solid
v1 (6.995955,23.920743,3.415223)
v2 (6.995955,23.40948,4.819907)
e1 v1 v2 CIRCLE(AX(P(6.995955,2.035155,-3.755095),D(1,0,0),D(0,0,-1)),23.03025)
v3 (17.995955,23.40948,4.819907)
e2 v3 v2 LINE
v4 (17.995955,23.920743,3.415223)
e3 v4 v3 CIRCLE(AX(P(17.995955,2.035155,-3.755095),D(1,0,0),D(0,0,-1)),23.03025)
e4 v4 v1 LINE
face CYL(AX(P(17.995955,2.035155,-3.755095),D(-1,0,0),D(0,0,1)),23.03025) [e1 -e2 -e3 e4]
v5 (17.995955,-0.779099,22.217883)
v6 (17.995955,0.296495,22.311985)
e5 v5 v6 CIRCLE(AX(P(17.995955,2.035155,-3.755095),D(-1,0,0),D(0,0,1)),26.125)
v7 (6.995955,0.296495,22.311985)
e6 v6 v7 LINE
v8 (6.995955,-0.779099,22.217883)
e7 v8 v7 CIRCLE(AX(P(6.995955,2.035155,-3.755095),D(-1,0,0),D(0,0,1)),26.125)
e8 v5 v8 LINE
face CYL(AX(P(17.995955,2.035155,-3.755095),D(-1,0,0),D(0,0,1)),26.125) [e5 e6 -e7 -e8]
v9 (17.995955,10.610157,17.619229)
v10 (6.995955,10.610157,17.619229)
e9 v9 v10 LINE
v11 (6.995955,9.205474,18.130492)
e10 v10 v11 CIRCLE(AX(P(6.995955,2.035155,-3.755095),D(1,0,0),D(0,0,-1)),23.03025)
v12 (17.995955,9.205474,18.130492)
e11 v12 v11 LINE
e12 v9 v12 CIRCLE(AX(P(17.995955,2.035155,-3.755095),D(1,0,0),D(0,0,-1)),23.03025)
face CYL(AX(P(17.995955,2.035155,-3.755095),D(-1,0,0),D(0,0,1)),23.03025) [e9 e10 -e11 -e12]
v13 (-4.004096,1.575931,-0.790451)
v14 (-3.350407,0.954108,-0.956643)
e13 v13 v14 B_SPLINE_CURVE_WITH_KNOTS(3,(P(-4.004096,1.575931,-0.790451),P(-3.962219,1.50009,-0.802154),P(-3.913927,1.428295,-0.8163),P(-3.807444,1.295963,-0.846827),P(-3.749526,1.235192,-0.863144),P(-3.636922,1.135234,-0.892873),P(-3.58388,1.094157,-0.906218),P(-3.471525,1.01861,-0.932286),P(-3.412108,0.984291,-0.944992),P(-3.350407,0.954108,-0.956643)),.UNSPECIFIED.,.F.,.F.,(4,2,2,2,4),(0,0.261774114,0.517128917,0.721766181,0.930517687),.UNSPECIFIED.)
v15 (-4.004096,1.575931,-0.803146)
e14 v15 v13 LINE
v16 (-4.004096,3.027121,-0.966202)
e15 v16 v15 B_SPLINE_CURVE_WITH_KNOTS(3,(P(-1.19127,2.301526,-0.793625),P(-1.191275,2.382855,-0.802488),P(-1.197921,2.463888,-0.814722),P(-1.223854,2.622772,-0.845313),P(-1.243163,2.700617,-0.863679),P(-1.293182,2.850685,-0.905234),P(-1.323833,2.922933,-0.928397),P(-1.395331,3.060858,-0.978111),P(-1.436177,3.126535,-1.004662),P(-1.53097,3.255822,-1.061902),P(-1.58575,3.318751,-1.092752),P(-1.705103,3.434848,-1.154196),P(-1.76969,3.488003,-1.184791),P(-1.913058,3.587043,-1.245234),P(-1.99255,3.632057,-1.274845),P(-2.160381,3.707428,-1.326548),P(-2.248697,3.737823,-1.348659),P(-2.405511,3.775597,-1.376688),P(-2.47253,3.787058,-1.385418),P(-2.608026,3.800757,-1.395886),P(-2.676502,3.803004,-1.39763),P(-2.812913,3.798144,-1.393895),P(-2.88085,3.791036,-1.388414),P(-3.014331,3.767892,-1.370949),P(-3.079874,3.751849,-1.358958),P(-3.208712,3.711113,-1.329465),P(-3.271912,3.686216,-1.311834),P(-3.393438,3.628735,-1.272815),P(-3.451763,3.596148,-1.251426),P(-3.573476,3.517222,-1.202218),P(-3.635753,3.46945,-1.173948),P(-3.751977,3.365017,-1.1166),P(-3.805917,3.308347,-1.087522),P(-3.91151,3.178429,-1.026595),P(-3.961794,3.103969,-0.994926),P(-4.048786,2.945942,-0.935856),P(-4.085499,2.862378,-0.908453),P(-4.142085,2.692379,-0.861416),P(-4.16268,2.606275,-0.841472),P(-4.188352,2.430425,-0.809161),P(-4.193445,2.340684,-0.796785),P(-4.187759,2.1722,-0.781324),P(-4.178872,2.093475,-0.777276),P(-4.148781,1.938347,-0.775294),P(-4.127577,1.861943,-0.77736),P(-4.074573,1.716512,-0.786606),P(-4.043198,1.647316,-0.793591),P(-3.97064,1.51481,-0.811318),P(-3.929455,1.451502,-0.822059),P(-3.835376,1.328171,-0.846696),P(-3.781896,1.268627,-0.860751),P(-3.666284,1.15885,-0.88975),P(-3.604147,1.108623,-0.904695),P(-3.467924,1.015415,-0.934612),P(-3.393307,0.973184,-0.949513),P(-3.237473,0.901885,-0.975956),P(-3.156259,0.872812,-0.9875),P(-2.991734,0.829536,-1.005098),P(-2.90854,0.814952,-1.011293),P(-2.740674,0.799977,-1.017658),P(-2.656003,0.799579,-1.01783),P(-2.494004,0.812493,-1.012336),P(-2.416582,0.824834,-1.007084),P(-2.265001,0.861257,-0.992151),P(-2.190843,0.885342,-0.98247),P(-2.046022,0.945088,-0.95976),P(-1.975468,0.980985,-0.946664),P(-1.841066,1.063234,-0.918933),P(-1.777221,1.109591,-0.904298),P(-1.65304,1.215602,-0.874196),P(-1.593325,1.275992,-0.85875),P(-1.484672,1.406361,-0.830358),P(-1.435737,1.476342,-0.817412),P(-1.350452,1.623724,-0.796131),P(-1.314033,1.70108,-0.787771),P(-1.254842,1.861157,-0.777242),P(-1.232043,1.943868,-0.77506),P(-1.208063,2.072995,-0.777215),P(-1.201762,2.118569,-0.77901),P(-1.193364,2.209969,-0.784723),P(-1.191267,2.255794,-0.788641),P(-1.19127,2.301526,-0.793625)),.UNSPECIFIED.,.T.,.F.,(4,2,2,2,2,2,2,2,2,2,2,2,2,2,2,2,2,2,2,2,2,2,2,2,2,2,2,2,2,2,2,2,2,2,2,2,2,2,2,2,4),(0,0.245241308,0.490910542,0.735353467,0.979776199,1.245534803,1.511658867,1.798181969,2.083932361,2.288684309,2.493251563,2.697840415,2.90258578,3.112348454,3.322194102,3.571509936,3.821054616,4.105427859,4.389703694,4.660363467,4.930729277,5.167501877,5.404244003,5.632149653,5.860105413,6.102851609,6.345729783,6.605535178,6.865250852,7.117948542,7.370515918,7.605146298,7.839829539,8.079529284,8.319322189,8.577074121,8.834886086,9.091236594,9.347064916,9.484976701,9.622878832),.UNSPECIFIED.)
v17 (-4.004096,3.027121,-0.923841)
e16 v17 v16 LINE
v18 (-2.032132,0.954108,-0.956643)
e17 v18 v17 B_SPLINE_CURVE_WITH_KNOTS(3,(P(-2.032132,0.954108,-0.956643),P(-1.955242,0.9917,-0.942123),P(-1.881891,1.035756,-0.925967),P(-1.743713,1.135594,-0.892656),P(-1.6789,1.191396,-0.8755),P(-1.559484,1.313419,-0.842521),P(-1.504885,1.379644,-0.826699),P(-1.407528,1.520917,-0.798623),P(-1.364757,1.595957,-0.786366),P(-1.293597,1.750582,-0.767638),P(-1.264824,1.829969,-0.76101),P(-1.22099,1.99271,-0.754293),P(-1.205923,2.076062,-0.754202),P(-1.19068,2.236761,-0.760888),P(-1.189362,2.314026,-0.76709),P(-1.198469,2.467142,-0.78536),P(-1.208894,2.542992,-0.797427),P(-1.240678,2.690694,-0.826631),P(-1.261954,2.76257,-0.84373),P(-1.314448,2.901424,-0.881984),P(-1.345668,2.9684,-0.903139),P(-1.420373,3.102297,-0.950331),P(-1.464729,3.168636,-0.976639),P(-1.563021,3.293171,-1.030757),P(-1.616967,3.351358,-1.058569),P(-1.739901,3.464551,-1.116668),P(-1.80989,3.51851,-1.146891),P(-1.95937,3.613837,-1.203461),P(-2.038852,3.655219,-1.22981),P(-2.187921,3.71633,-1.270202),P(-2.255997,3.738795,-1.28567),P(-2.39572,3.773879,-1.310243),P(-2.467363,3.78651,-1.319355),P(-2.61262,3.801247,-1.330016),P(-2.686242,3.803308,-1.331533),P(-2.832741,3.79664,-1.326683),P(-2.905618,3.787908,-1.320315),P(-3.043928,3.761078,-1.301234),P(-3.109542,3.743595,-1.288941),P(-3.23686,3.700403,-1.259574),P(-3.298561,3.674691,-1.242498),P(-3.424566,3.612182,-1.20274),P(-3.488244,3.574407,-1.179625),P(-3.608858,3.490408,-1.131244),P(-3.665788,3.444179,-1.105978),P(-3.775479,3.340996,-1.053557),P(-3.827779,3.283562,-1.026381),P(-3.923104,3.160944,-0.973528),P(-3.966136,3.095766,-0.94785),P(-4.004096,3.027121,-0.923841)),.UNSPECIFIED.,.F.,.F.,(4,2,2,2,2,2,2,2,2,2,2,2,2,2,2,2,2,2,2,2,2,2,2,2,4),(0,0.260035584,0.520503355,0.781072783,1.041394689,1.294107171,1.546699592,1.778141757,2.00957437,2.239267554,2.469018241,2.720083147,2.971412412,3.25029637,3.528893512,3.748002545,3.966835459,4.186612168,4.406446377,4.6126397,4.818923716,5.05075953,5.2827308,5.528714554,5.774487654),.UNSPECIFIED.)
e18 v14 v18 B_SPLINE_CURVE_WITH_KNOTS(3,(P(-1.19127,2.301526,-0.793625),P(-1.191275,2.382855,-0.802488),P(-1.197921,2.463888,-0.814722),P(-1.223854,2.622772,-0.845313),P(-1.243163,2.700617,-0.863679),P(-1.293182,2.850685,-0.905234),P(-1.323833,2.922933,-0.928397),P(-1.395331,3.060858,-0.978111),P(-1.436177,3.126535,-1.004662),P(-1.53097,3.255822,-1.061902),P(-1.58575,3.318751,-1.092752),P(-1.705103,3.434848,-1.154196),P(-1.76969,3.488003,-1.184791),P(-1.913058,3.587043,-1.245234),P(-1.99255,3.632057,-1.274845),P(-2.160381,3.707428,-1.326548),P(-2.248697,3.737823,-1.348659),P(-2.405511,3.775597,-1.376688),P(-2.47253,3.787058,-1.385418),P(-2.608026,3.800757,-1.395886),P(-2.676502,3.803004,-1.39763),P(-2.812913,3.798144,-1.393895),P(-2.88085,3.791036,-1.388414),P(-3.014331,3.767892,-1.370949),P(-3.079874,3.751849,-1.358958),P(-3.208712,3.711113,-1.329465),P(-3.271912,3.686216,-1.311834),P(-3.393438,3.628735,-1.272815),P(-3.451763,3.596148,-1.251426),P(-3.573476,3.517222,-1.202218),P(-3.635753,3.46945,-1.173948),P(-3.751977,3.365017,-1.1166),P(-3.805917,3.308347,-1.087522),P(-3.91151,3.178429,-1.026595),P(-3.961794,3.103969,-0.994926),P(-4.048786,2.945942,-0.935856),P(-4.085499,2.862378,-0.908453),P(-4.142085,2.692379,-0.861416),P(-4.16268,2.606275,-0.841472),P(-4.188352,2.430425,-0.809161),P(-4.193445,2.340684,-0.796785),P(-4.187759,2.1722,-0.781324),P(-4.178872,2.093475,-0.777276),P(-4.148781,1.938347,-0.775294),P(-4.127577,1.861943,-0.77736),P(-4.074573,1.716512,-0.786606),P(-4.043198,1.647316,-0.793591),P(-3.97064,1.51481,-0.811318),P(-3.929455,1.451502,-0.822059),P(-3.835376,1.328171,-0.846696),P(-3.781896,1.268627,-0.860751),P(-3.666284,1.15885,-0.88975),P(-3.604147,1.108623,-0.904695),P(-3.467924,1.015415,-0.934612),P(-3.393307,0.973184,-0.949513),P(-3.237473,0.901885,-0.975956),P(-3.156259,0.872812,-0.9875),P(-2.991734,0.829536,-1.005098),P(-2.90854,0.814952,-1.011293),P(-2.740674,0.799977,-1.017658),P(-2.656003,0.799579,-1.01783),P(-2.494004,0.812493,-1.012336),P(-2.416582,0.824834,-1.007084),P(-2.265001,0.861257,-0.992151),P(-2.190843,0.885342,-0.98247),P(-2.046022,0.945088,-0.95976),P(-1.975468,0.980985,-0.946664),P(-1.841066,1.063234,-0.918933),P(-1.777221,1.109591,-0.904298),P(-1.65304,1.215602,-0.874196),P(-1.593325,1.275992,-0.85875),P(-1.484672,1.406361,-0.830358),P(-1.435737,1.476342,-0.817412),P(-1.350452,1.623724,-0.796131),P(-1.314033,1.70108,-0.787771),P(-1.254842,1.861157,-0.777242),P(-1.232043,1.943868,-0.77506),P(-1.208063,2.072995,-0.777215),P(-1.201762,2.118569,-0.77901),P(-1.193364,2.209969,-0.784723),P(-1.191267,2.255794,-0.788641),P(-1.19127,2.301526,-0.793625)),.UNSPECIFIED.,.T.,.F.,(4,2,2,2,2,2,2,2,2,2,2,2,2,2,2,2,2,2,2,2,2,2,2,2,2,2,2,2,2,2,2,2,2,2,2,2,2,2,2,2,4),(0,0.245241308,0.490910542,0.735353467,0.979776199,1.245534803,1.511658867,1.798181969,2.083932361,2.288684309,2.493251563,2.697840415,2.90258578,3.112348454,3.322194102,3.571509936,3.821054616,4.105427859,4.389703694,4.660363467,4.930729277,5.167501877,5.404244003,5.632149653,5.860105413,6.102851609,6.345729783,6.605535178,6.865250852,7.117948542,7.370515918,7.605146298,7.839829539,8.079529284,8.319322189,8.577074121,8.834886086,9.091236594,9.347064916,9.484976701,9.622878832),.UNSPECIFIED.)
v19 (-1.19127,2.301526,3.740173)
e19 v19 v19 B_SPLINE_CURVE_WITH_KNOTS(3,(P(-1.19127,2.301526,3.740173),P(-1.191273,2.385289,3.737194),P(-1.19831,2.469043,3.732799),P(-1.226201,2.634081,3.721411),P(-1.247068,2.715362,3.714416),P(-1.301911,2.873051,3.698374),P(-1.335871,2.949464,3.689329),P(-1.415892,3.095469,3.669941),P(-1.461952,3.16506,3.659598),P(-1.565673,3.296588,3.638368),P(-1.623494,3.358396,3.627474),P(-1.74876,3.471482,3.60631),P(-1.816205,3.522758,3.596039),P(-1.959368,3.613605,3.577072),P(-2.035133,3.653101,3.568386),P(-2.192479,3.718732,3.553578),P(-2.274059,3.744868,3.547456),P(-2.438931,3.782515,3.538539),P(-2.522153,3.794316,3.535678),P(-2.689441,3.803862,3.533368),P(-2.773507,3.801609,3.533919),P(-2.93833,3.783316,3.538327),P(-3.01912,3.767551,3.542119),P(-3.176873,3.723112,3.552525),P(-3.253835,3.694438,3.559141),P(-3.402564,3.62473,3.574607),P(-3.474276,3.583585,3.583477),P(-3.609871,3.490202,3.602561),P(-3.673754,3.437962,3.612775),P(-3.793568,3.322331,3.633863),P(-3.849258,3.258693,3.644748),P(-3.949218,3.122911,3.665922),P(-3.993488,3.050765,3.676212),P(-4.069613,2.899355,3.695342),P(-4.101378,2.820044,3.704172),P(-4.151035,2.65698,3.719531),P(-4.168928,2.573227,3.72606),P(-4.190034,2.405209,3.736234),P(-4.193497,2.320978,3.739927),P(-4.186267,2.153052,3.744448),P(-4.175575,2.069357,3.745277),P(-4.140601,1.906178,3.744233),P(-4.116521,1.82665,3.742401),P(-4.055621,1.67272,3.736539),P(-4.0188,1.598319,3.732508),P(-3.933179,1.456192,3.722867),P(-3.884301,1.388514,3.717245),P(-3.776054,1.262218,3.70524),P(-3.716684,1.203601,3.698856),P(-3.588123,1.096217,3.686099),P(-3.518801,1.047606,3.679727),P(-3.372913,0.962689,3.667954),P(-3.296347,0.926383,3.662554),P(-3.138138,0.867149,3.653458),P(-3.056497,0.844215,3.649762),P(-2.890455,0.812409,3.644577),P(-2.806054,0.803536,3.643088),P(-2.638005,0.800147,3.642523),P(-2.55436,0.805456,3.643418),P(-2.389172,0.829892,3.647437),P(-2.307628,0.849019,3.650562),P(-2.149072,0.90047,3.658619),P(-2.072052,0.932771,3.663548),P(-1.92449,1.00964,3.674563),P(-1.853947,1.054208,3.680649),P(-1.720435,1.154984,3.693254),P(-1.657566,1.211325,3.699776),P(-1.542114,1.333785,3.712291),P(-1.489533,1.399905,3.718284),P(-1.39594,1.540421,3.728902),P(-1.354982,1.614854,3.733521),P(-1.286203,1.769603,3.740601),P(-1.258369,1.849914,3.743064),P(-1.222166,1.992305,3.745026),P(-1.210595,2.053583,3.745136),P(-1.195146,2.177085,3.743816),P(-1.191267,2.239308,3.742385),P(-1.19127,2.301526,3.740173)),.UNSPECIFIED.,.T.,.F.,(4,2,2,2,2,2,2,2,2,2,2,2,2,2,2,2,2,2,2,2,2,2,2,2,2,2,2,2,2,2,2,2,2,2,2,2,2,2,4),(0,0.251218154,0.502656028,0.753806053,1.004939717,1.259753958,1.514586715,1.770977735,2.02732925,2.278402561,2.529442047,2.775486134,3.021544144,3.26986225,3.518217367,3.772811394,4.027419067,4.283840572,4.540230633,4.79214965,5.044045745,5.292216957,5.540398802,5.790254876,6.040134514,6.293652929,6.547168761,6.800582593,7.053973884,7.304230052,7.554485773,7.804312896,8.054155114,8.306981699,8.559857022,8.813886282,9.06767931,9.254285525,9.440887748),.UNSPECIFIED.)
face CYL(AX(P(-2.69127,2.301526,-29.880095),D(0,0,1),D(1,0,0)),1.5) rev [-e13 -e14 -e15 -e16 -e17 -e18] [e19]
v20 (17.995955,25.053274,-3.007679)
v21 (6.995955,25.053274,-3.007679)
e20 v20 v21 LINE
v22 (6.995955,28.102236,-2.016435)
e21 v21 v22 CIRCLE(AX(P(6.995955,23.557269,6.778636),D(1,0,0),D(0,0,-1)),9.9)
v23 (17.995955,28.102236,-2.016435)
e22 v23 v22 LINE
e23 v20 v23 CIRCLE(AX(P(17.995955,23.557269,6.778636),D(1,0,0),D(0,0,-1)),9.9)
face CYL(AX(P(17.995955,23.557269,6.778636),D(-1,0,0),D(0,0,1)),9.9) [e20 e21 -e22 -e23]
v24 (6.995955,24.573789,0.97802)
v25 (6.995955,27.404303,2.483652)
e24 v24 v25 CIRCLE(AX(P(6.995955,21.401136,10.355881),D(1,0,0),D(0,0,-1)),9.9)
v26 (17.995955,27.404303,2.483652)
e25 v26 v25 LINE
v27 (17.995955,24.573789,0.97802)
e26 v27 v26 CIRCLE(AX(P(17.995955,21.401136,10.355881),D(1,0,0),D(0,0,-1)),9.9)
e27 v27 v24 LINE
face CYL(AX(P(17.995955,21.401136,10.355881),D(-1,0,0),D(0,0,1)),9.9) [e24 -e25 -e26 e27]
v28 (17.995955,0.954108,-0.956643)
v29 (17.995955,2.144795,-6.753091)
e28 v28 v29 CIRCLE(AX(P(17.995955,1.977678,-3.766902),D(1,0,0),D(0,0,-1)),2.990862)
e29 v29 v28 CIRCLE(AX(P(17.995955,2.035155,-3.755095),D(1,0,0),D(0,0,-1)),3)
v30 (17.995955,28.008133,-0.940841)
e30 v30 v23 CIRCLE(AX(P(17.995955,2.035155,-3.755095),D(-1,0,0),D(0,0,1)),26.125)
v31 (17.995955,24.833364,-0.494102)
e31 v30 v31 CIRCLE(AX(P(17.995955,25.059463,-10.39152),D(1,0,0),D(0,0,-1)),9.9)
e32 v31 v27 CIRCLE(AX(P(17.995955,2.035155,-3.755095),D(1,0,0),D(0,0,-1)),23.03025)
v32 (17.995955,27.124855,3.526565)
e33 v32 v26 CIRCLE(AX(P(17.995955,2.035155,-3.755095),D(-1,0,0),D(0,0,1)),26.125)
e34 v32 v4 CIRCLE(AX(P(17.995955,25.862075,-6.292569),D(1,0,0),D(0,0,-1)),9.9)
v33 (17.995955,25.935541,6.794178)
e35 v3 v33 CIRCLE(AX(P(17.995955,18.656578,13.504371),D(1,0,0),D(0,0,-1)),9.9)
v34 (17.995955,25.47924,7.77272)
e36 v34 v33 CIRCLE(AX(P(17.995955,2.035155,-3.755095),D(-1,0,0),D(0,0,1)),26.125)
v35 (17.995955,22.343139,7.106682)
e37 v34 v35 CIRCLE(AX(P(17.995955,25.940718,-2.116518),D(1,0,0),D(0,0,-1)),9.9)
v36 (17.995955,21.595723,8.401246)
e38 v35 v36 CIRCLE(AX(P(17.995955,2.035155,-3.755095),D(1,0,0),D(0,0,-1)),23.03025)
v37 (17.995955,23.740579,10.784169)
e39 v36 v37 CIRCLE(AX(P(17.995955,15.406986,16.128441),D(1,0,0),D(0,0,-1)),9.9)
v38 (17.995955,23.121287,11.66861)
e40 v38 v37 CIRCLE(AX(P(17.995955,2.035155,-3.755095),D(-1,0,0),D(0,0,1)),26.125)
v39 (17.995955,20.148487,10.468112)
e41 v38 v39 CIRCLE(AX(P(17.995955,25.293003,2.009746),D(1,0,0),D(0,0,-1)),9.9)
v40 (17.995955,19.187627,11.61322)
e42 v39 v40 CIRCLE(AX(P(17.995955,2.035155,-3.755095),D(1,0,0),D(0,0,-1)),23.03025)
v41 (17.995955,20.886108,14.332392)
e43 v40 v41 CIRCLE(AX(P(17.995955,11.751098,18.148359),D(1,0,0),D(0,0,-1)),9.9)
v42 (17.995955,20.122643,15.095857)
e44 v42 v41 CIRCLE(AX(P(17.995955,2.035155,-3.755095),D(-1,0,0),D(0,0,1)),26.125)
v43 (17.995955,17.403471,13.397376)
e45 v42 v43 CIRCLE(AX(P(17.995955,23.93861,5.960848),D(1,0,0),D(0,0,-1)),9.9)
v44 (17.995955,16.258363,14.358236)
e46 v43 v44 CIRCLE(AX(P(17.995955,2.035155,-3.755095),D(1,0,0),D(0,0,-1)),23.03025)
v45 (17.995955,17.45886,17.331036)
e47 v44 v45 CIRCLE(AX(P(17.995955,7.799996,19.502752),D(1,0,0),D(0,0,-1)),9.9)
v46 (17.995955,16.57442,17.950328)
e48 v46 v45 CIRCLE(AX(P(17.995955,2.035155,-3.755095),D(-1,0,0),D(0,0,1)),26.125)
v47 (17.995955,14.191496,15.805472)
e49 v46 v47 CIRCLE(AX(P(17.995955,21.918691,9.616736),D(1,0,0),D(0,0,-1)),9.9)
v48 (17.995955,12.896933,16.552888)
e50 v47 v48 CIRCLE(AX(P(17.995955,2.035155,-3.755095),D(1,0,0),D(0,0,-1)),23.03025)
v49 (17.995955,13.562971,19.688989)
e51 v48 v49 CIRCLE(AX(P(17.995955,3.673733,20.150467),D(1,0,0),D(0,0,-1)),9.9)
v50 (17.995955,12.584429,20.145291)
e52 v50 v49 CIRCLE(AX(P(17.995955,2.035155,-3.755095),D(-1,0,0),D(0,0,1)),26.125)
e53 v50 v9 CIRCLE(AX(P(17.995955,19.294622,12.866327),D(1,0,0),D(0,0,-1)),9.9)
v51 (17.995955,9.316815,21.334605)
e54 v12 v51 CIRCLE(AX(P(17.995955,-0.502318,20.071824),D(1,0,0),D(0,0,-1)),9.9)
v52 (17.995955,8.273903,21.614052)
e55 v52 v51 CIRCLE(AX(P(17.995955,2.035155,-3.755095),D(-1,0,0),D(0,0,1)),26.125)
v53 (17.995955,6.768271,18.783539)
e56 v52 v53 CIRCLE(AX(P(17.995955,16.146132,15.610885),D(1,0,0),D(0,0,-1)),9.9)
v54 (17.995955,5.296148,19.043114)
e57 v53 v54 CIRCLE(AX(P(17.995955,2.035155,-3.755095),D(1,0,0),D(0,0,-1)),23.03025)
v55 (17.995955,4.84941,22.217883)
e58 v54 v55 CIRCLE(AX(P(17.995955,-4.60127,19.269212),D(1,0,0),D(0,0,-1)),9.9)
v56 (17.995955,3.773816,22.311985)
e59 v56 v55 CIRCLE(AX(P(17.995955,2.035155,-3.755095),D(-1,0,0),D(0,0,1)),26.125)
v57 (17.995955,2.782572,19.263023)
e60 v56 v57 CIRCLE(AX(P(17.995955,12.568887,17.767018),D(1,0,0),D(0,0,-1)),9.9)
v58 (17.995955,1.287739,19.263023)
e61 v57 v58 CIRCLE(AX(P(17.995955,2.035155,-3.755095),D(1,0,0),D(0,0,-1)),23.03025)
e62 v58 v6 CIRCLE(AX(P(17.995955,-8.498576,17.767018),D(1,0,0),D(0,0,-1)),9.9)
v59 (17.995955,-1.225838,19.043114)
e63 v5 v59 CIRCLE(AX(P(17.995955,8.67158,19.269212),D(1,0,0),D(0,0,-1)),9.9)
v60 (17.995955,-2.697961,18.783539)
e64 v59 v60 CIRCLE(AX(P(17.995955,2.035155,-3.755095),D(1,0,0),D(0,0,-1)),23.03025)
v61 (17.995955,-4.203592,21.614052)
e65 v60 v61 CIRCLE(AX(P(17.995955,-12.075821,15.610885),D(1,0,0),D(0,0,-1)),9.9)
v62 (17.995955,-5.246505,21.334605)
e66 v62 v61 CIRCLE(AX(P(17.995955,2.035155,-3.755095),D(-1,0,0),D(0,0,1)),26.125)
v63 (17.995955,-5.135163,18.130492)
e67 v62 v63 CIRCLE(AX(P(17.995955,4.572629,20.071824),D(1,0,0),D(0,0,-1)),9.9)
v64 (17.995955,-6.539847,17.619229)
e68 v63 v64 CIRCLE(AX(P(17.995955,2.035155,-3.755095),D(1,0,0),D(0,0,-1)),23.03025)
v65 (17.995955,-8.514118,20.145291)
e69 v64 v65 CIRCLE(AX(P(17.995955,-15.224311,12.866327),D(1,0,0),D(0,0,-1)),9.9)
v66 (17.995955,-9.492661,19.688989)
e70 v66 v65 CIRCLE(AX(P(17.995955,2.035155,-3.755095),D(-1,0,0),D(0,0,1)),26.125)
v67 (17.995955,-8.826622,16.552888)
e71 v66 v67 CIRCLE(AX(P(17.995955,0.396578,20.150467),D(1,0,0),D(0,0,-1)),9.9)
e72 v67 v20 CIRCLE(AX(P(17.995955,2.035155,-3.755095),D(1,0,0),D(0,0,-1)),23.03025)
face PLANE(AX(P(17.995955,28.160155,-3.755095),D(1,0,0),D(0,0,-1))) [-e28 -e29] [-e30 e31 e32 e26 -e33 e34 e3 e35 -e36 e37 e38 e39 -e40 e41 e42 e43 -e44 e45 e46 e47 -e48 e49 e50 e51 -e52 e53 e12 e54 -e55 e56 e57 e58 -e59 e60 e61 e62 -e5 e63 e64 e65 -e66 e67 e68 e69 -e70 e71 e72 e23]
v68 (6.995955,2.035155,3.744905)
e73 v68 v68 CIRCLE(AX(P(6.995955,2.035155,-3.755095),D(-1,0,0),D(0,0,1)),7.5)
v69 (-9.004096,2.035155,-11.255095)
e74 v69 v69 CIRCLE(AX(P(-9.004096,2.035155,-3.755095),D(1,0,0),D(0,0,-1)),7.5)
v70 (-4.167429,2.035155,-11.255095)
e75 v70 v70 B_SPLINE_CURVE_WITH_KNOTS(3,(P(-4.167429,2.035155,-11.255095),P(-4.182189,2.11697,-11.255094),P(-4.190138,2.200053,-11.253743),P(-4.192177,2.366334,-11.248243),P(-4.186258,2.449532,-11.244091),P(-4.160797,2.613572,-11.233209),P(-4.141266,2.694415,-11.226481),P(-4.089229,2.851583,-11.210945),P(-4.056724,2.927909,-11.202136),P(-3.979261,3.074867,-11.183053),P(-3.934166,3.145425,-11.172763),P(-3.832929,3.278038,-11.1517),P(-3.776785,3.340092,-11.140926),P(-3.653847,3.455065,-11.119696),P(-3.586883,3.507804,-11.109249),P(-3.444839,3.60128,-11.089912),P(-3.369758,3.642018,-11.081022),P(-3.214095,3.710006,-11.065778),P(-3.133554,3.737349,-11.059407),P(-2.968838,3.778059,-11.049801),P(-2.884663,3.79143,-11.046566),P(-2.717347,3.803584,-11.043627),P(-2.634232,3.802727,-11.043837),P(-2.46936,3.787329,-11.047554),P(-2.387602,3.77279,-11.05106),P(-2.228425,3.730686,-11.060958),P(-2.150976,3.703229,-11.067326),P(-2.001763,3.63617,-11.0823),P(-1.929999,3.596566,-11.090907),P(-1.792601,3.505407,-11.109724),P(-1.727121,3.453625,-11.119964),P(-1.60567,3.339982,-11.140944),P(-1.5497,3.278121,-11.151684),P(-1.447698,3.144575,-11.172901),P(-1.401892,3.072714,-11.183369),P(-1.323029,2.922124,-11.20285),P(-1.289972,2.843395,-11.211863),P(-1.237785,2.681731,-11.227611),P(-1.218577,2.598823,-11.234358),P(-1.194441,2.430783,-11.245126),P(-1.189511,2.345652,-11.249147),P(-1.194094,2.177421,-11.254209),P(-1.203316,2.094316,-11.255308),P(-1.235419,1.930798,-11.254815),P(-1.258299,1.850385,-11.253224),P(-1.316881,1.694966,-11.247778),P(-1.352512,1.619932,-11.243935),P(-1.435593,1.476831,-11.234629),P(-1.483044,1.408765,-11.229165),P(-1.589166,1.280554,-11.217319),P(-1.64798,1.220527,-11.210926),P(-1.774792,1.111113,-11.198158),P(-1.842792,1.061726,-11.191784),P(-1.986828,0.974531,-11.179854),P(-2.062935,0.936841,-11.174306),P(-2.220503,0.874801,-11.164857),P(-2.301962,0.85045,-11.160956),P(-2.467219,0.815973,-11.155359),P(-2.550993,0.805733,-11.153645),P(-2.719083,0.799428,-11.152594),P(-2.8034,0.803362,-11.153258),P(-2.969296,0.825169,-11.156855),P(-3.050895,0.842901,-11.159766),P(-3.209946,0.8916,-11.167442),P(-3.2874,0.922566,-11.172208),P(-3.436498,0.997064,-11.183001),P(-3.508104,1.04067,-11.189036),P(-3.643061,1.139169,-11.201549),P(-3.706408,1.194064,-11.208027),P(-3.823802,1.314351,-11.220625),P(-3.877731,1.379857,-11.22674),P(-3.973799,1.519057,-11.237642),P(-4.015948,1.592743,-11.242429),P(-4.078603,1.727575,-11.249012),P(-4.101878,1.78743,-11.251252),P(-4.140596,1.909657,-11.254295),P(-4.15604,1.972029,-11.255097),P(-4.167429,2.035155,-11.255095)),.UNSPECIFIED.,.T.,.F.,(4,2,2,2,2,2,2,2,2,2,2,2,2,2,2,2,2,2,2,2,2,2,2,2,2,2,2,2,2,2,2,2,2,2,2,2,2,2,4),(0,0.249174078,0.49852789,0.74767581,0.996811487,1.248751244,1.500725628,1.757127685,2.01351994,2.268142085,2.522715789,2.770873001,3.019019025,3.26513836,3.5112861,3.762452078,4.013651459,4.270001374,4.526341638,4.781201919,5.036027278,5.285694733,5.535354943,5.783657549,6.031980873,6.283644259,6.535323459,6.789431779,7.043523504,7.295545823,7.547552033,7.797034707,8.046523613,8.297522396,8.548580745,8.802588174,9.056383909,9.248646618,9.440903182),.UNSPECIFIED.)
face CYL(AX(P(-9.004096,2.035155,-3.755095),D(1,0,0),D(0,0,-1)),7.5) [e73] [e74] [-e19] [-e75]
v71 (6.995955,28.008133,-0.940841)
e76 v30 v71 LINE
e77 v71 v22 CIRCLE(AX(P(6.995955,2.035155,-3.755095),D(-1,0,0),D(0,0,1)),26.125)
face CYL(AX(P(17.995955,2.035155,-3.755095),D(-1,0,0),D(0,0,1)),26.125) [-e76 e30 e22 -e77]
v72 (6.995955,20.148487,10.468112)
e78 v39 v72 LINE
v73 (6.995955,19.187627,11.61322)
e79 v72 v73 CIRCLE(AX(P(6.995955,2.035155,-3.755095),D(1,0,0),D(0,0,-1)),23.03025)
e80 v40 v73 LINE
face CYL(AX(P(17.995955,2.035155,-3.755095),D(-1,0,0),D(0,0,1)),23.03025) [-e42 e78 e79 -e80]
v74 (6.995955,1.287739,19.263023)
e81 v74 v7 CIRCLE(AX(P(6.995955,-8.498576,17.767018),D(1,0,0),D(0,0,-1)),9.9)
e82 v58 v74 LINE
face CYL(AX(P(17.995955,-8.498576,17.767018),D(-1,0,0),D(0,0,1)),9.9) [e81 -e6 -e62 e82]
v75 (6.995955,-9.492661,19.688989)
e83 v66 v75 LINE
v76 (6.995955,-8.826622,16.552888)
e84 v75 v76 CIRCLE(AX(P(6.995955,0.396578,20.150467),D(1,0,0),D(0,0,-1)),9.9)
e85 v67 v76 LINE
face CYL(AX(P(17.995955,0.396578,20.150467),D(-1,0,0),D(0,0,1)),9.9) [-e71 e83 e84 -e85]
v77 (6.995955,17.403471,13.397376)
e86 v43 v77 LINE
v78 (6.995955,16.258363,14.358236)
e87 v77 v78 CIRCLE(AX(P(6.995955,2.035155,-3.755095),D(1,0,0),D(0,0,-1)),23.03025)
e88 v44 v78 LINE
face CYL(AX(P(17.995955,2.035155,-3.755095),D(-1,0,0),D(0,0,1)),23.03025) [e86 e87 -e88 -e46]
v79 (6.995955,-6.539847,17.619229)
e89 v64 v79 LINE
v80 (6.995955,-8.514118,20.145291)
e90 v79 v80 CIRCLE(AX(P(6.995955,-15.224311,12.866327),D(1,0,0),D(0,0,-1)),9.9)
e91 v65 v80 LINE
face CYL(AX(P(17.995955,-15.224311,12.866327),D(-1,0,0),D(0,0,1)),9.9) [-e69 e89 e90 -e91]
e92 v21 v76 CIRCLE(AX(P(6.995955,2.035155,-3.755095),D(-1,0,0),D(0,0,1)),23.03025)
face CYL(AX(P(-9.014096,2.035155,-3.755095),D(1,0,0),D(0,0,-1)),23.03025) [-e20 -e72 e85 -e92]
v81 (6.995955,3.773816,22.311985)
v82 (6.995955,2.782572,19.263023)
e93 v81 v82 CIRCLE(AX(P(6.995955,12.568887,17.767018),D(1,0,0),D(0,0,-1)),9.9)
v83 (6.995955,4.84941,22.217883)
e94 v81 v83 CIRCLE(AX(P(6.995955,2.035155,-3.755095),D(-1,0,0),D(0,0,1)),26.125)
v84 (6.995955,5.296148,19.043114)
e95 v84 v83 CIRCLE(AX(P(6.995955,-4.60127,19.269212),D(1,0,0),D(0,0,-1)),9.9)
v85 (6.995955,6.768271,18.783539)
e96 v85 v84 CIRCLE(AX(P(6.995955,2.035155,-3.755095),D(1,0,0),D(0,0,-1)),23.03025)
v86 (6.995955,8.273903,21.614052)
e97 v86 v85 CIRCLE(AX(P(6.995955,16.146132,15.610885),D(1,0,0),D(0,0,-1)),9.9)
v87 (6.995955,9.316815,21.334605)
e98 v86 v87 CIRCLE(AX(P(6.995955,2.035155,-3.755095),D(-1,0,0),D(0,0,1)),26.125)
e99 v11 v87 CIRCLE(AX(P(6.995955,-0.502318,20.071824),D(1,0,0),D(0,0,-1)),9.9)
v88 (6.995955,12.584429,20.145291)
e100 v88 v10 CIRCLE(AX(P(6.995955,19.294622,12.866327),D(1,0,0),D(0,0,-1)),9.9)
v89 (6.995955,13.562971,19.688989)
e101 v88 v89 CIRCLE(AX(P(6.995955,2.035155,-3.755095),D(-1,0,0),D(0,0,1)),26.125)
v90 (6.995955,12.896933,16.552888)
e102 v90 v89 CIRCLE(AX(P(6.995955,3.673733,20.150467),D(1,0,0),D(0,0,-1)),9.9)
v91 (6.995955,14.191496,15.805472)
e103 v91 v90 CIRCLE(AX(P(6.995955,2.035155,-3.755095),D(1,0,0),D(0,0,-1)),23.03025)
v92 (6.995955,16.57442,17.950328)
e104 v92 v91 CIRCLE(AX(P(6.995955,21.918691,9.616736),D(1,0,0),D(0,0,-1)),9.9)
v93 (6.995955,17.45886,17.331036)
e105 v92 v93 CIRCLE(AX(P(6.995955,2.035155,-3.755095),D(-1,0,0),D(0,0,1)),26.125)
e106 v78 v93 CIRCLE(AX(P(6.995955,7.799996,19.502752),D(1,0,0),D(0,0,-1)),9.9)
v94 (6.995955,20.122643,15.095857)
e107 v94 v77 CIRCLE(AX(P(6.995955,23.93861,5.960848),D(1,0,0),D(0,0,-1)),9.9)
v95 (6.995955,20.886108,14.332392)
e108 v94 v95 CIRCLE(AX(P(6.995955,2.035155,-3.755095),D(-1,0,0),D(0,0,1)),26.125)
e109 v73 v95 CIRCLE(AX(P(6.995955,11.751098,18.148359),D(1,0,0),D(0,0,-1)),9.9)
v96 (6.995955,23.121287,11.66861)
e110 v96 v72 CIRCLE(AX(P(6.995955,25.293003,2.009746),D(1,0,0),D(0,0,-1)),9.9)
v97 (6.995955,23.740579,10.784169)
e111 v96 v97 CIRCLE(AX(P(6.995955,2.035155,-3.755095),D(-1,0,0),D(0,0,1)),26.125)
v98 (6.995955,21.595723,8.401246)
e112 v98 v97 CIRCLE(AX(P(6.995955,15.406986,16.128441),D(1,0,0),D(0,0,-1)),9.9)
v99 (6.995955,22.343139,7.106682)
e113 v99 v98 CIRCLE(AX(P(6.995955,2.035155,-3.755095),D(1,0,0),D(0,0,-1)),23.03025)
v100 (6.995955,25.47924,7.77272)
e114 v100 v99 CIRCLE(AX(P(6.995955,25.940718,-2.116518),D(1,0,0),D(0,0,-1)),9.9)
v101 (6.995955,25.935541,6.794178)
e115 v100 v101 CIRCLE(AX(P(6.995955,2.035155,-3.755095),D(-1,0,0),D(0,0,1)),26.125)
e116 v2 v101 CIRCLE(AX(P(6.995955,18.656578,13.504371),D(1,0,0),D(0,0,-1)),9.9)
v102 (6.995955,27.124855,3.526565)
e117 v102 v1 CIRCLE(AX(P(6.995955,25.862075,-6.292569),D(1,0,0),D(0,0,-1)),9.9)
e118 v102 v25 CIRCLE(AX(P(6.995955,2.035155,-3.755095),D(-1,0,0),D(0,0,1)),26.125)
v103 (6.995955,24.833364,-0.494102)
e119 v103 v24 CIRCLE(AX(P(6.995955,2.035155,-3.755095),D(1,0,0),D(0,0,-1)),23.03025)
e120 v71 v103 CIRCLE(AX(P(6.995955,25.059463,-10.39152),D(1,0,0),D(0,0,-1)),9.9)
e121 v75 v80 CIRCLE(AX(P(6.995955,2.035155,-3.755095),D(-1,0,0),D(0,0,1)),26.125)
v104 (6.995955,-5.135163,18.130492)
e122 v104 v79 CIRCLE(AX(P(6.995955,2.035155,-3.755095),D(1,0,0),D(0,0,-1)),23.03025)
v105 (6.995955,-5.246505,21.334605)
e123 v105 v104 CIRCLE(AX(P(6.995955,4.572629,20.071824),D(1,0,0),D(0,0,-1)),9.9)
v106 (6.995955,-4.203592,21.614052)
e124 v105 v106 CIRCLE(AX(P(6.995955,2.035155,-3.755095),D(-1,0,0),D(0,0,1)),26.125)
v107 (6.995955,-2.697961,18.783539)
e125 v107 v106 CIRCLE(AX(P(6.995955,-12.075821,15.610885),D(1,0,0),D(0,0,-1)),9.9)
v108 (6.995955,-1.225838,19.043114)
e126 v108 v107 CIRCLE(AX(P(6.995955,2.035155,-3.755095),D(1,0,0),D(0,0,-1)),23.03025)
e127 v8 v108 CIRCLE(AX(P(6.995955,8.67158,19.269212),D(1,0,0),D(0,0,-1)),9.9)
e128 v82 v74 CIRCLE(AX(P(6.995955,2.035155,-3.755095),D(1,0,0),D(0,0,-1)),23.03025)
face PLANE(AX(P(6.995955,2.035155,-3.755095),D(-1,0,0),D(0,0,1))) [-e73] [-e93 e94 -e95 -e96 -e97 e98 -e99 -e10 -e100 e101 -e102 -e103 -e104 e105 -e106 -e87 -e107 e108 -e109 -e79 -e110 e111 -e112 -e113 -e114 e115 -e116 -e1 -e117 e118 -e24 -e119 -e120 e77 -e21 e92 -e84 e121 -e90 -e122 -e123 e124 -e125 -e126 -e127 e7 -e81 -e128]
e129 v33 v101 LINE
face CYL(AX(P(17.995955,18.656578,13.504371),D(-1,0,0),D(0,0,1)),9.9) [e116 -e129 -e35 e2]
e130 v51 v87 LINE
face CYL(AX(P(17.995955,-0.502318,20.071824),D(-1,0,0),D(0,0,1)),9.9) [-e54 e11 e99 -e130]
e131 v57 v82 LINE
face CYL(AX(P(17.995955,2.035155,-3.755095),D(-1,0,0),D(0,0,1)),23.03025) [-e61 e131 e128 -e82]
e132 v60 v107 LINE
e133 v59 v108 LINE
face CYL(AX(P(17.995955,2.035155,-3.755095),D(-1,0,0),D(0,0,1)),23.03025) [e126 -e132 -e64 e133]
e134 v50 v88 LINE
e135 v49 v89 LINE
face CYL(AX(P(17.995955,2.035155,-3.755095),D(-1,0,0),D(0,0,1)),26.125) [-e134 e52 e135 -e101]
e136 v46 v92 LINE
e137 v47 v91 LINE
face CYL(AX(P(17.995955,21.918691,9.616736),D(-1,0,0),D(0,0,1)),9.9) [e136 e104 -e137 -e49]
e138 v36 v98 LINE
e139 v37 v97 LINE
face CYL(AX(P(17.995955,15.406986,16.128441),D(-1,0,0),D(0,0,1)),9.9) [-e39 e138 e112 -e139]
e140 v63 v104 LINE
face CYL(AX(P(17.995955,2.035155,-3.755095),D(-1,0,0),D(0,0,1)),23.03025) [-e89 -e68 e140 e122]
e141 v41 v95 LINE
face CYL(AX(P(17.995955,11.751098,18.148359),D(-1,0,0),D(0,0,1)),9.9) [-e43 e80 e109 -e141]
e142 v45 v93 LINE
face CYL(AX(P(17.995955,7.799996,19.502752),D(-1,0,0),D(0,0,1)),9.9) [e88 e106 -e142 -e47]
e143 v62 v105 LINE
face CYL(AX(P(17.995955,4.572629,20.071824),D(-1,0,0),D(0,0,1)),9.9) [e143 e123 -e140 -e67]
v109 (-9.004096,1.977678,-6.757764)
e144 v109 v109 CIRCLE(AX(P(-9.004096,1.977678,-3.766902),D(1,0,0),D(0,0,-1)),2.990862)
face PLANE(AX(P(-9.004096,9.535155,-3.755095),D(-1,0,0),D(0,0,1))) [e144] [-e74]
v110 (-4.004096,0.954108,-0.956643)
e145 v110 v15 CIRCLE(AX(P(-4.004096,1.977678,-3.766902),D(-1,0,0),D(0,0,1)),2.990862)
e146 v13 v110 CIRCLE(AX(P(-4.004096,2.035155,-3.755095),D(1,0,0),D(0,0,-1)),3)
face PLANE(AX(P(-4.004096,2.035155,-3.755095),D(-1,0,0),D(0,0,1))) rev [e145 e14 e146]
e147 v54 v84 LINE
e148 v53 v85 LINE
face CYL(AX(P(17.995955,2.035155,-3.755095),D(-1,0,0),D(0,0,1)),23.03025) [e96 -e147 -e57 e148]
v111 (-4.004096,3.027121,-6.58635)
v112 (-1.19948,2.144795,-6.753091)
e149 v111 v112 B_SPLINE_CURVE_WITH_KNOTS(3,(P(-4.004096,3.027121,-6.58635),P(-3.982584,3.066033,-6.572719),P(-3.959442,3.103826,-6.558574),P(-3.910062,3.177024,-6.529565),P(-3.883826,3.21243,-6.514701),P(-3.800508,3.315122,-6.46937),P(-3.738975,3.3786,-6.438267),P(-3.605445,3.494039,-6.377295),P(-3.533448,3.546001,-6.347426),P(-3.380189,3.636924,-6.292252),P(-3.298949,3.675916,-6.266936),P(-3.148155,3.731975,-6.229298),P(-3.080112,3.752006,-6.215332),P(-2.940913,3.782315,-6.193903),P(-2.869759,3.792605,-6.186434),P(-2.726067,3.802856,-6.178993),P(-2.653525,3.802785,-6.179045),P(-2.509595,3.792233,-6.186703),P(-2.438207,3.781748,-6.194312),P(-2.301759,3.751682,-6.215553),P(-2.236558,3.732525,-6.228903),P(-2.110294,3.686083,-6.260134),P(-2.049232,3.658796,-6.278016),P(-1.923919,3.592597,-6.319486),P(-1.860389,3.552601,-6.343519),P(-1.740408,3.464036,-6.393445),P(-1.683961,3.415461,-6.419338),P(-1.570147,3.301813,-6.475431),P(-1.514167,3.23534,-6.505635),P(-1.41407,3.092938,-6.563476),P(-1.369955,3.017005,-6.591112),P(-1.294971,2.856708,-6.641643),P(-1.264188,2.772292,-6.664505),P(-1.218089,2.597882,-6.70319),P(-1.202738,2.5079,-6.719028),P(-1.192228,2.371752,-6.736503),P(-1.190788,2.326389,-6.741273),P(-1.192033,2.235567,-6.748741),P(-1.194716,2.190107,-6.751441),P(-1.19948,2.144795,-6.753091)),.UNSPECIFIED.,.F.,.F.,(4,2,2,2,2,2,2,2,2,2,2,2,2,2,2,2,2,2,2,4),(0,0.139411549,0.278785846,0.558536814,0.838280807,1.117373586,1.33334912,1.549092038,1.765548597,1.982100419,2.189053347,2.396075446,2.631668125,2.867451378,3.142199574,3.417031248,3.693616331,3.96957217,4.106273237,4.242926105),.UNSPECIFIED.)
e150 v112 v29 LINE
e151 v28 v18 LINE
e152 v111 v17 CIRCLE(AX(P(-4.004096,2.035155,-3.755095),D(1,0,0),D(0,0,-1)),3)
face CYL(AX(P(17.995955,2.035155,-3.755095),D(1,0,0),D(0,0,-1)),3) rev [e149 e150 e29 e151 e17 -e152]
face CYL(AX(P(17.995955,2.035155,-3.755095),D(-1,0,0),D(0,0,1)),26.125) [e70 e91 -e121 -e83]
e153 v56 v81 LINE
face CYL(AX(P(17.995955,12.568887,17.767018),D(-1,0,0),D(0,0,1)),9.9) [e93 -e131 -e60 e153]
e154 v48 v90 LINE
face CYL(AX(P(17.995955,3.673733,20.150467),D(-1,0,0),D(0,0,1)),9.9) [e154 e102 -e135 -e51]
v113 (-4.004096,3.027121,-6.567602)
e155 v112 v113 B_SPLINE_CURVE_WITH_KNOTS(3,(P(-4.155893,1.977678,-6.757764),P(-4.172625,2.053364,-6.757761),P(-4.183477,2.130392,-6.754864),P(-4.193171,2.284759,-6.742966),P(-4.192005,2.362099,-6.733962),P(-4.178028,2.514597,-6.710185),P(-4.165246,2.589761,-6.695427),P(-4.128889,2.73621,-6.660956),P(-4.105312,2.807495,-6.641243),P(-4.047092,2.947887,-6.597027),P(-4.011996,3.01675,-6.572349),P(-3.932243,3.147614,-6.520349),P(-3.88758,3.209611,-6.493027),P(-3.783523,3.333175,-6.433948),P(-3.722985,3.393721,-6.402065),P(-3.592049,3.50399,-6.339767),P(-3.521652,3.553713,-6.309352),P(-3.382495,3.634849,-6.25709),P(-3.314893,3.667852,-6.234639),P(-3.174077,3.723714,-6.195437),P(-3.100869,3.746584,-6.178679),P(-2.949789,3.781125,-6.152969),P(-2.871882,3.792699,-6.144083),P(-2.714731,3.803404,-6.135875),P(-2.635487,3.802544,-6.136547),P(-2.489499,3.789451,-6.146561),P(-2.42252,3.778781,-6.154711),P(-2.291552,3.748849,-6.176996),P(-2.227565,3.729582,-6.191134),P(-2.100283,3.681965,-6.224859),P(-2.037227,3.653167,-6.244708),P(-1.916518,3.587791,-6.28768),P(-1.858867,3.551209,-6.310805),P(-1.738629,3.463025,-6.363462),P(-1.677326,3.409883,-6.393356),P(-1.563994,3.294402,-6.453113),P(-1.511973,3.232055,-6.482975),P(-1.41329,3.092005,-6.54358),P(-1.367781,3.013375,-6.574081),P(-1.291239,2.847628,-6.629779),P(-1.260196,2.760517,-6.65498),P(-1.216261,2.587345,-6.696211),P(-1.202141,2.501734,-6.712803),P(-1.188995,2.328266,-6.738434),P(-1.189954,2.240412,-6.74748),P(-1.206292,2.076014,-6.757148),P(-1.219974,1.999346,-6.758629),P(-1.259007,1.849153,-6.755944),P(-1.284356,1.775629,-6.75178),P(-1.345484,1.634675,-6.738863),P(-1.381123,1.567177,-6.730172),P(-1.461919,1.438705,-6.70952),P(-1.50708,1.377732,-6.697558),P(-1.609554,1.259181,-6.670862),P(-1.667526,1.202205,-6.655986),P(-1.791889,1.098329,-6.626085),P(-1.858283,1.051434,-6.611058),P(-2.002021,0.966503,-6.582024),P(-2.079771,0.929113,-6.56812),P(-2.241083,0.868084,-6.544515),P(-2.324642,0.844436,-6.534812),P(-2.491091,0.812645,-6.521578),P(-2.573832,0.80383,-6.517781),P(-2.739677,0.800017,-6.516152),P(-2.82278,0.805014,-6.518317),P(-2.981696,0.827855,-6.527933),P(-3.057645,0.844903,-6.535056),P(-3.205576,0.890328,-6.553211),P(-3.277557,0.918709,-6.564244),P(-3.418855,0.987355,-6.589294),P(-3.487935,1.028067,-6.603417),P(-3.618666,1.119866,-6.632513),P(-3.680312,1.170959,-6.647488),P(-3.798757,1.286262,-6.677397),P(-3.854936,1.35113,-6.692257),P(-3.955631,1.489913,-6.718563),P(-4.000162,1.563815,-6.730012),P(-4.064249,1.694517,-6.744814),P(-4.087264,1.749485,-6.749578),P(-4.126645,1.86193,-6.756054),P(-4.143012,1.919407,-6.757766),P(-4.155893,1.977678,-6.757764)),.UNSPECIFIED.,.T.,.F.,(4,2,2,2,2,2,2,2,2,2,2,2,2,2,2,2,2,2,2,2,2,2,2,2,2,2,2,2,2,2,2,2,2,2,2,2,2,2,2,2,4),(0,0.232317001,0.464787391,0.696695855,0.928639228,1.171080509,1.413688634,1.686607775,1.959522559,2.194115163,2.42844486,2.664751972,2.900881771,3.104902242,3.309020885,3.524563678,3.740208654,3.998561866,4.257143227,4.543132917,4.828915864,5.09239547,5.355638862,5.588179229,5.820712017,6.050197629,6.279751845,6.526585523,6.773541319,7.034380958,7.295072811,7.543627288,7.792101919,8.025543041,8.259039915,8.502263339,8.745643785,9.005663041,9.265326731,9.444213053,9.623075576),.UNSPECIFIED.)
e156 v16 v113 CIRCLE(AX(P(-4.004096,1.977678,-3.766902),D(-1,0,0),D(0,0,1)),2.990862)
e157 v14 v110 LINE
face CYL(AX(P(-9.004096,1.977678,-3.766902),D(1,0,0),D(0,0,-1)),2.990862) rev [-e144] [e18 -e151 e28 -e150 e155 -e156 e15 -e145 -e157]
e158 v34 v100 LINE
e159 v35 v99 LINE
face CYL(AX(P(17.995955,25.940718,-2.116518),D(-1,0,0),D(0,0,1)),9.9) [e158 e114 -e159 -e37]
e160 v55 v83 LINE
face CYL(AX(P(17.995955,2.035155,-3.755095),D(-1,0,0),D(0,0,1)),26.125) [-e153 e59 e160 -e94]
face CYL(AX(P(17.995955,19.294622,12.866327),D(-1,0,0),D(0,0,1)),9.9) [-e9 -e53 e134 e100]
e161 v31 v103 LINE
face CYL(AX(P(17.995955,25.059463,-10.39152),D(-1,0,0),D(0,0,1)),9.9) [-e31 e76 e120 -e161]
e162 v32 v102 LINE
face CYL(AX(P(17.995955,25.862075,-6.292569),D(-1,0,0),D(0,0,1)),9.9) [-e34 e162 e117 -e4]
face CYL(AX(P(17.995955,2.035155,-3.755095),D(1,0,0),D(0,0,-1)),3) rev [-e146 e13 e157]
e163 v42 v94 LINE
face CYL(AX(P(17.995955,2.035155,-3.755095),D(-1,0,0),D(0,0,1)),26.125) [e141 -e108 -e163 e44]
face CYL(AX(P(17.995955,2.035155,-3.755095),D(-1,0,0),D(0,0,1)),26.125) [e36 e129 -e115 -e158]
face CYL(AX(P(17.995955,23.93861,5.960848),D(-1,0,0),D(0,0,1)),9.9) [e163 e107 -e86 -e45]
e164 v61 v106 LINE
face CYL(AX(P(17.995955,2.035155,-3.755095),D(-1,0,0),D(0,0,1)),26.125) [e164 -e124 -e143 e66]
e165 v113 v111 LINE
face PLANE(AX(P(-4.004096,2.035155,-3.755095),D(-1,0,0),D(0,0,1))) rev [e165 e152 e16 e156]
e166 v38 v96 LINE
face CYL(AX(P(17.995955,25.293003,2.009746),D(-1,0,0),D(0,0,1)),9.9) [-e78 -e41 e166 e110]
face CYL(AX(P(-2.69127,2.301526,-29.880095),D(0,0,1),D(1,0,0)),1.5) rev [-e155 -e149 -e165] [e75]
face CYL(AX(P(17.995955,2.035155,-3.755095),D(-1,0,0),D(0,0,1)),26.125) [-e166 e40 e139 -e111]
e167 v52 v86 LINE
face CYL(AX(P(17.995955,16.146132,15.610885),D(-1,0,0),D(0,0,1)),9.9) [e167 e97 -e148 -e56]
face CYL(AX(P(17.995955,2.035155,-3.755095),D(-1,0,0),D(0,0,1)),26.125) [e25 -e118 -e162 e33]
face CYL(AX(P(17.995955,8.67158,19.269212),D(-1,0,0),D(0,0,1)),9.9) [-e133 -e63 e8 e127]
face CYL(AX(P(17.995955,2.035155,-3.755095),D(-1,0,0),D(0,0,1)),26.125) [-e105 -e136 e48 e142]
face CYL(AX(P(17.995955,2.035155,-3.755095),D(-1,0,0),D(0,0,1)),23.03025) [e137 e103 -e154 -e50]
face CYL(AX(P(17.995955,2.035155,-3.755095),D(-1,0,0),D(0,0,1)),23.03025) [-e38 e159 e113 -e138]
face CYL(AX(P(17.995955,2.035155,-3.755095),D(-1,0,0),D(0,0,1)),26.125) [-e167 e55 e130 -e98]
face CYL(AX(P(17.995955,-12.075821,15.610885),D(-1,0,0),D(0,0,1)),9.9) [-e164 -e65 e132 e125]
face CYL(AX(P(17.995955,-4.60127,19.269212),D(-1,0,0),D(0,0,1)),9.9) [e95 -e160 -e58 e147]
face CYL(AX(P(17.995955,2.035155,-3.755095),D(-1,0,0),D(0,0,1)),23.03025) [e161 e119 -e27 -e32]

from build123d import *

# Parameters (mm, degrees)
SKETCH1_W                    = 11
SKETCH1_H                    = 26.125
CUT_EXTRUDE1_DEPTH           = 43.506639989
CUT_EXTRUDE2_DEPTH           = 43.506639989
CUT_EXTRUDE3_DEPTH           = 43.506639989
CUT_EXTRUDE4_DEPTH           = 43.506639989
CUT_EXTRUDE5_DEPTH           = 43.506639989
CUT_EXTRUDE6_DEPTH           = 43.506639989
CUT_EXTRUDE7_DEPTH           = 43.506639989
CUT_EXTRUDE8_DEPTH           = 43.506639989
CUT_EXTRUDE9_DEPTH           = 43.506639989
CUT_EXTRUDE10_DEPTH          = 43.506639989
CUT_EXTRUDE11_DEPTH          = 43.468291129
CUT_EXTRUDE12_DEPTH          = 43.468291129
CUT_EXTRUDE13_DEPTH          = 43.468291129
SKETCH15_W                   = 16.0000508
SKETCH15_H                   = 7.5
F_6_0_6_DIAMETER_HOLE1_D     = 6
F_6_0_6_DIAMETER_HOLE1_DEPTH = 22.0000508
CUT_EXTRUDE14_DEPTH          = 45.792969961
CUT_EXTRUDE14_DEPTH_BACK     = 45.792969961
SKETCH22_R                   = 2.990861642
CUT_EXTRUDE15_DEPTH          = 45.792969961
CUT_EXTRUDE15_DEPTH_BACK     = 45.792969961
SKETCH23_R                   = 1.5
SPLIT1_START                 = 6.995955282
SPLIT1_DEPTH                 = 11


# Read off the part's stored shape, not the designer's step: Split1
with BuildPart() as part:
    # Sketch1 → Revolve1 (revolve)
    with BuildSketch(Plane(origin=(0, 0, -3.755095368), x_dir=(-1, 0, 0), z_dir=(0, 0, -1)), mode=Mode.PRIVATE) as revolve1_sk:
        with Locations((-12.495955282, 15.097655255)):
            Rectangle(SKETCH1_W, SKETCH1_H)
    revolve(revolve1_sk.sketch.rotate(Axis((17.995955282, 2.035155255, -3.755095368), (-1, 0, 0)), 270), axis=Axis((17.995955282, 2.035155255, -3.755095368), (-1, 0, 0)))

    # Sketch2 → Cut-Extrude1 (cut, through all)
    with BuildSketch(Plane.ZY.offset(-6.995955282)):
        with BuildLine():
            ThreePointArc((14.332392383, 20.8861078), (13.037730936, 22.048066331), (11.668609565, 23.121286981))
            ThreePointArc((11.668609565, 23.121286981), (11.189500109, 21.585967652), (10.468111889, 20.148487096))
            ThreePointArc((10.468111889, 20.148487096), (11.04846398, 19.677350291), (11.613220242, 19.187627099))
            ThreePointArc((11.613220242, 19.187627099), (12.903594489, 20.14767169), (14.332392383, 20.8861078))
        make_face()
    extrude(amount=-CUT_EXTRUDE1_DEPTH, mode=Mode.SUBTRACT)

    # Sketch3 → Cut-Extrude2 (cut, through all)
    with BuildSketch(Plane.ZY.offset(-6.995955282)):
        with BuildLine():
            ThreePointArc((17.331036359, 17.458860187), (16.257815709, 18.827981558), (15.095857178, 20.122643005))
            ThreePointArc((15.095857178, 20.122643005), (14.357421068, 18.693845111), (13.397376477, 17.403470864))
            ThreePointArc((13.397376477, 17.403470864), (13.887099669, 16.838714603), (14.358236474, 16.258362511))
            ThreePointArc((14.358236474, 16.258362511), (15.79571703, 16.979750731), (17.331036359, 17.458860187))
        make_face()
    extrude(amount=-CUT_EXTRUDE2_DEPTH, mode=Mode.SUBTRACT)

    # Sketch4 → Cut-Extrude3 (cut, through all)
    with BuildSketch(Plane.ZY.offset(-6.995955282)):
        with BuildLine():
            ThreePointArc((19.688988892, 13.562971103), (18.869818306, 15.097655255), (17.950328137, 16.574419867))
            ThreePointArc((17.950328137, 16.574419867), (16.97500238, 15.295556708), (15.805471888, 14.191496139))
            ThreePointArc((15.805471888, 14.191496139), (16.189686188, 13.550280255), (16.552888283, 12.896932968))
            ThreePointArc((16.552888283, 12.896932968), (18.093798029, 13.3577458), (19.688988892, 13.562971103))
        make_face()
    extrude(amount=-CUT_EXTRUDE3_DEPTH, mode=Mode.SUBTRACT)

    # Sketch5 → Cut-Extrude4 (cut, through all)
    with BuildSketch(Plane.ZY.offset(-6.995955282)):
        with BuildLine():
            ThreePointArc((21.334604788, 9.316815169), (20.794374351, 10.970431499), (20.145290787, 12.584428531))
            ThreePointArc((20.145290787, 12.584428531), (18.962710163, 11.494357717), (17.619229361, 10.610157148))
            ThreePointArc((17.619229361, 10.610157148), (17.886260612, 9.91196466), (18.130492286, 9.205473805))
            ThreePointArc((18.130492286, 9.205473805), (19.728011459, 9.391709686), (21.334604788, 9.316815169))
        make_face()
    extrude(amount=-CUT_EXTRUDE4_DEPTH, mode=Mode.SUBTRACT)

    # Sketch6 → Cut-Extrude5 (cut, through all)
    with BuildSketch(Plane.ZY.offset(-6.995955282)):
        with BuildLine():
            ThreePointArc((22.217882841, 4.849409683), (21.97300718, 6.571713896), (21.614052298, 8.273902864))
            ThreePointArc((21.614052298, 8.273902864), (20.26014892, 7.405745646), (18.783538793, 6.768271063))
            ThreePointArc((18.783538793, 6.768271063), (18.925273386, 6.034316198), (19.043113783, 5.296148141))
            ThreePointArc((19.043113783, 5.296148141), (20.648702571, 5.202148388), (22.217882841, 4.849409683))
        make_face()
    extrude(amount=-CUT_EXTRUDE5_DEPTH, mode=Mode.SUBTRACT)

    # Sketch7 → Cut-Extrude6 (cut, through all)
    with BuildSketch(Plane.ZY.offset(-6.995955282)):
        with BuildLine():
            ThreePointArc((22.311985094, 0.2964945), (22.369904632, 2.035155255), (22.311985094, 3.773816009))
            ThreePointArc((22.311985094, 3.773816009), (20.827896632, 3.153950904), (19.263023231, 2.78257165))
            ThreePointArc((19.263023231, 2.78257165), (19.275154632, 2.035155255), (19.263023231, 1.287738859))
            ThreePointArc((19.263023231, 1.287738859), (20.827896632, 0.916359605), (22.311985094, 0.2964945))
        make_face()
    extrude(amount=-CUT_EXTRUDE6_DEPTH, mode=Mode.SUBTRACT)

    # Sketch8 → Cut-Extrude7 (cut, through all)
    with BuildSketch(Plane.ZY.offset(-6.995955282)):
        with BuildLine():
            ThreePointArc((21.614052298, -4.203592355), (21.97300718, -2.501403387), (22.217882841, -0.779099174))
            ThreePointArc((22.217882841, -0.779099174), (20.648702571, -1.131837878), (19.043113783, -1.225837632))
            ThreePointArc((19.043113783, -1.225837632), (18.925273386, -1.964005689), (18.783538793, -2.697960554))
            ThreePointArc((18.783538793, -2.697960554), (20.26014892, -3.335435137), (21.614052298, -4.203592355))
        make_face()
    extrude(amount=-CUT_EXTRUDE7_DEPTH, mode=Mode.SUBTRACT)

    # Sketch9 → Cut-Extrude8 (cut, through all)
    with BuildSketch(Plane.ZY.offset(-6.995955282)):
        with BuildLine():
            ThreePointArc((20.145290787, -8.514118022), (20.794374351, -6.90012099), (21.334604788, -5.24650466))
            ThreePointArc((21.334604788, -5.24650466), (19.728011459, -5.321399177), (18.130492286, -5.135163296))
            ThreePointArc((18.130492286, -5.135163296), (17.886260612, -5.841654151), (17.619229361, -6.539846639))
            ThreePointArc((17.619229361, -6.539846639), (18.962710163, -7.424047208), (20.145290787, -8.514118022))
        make_face()
    extrude(amount=-CUT_EXTRUDE8_DEPTH, mode=Mode.SUBTRACT)

    # Sketch10 → Cut-Extrude9 (cut, through all)
    with BuildSketch(Plane.ZY.offset(-6.995955282)):
        with BuildLine():
            ThreePointArc((17.950328137, -12.504109358), (18.869818306, -11.027344745), (19.688988892, -9.492660594))
            ThreePointArc((19.688988892, -9.492660594), (18.093798029, -9.287435291), (16.552888283, -8.826622459))
            ThreePointArc((16.552888283, -8.826622459), (16.189686188, -9.479969745), (15.805471888, -10.12118563))
            ThreePointArc((15.805471888, -10.12118563), (16.97500238, -11.225246199), (17.950328137, -12.504109358))
        make_face()
    extrude(amount=-CUT_EXTRUDE9_DEPTH, mode=Mode.SUBTRACT)

    # Sketch11 → Cut-Extrude10 (cut, through all)
    with BuildSketch(Plane.ZY.offset(-6.995955282)):
        with BuildLine():
            ThreePointArc((-2.016434613, 28.102235716), (-3.755095368, 28.160155255), (-5.493756122, 28.102235716))
            ThreePointArc((-5.493756122, 28.102235716), (-4.873891017, 26.618147254), (-4.502511763, 25.053273853))
            ThreePointArc((-4.502511763, 25.053273853), (-3.755095368, 25.065405255), (-3.007678972, 25.053273853))
            ThreePointArc((-3.007678972, 25.053273853), (-2.636299718, 26.618147254), (-2.016434613, 28.102235716))
        make_face()
    extrude(amount=-CUT_EXTRUDE10_DEPTH, mode=Mode.SUBTRACT)

    # Sketch12 → Cut-Extrude11 (cut, through all)
    with BuildSketch(Plane.ZY.offset(-6.995955282)):
        with BuildLine():
            ThreePointArc((2.483652242, 27.40430292), (0.781463274, 27.763257802), (-0.940840939, 28.008133463))
            ThreePointArc((-0.940840939, 28.008133463), (-0.588102235, 26.438953193), (-0.494102481, 24.833364405))
            ThreePointArc((-0.494102481, 24.833364405), (0.244065576, 24.715524008), (0.978020441, 24.573789415))
            ThreePointArc((0.978020441, 24.573789415), (1.615495024, 26.050399542), (2.483652242, 27.40430292))
        make_face()
    extrude(amount=-CUT_EXTRUDE11_DEPTH, mode=Mode.SUBTRACT)

    # Sketch13 → Cut-Extrude12 (cut, through all)
    with BuildSketch(Plane.ZY.offset(-6.995955282)):
        with BuildLine():
            ThreePointArc((6.794177909, 25.935541409), (5.180180877, 26.584624973), (3.526564547, 27.12485541))
            ThreePointArc((3.526564547, 27.12485541), (3.601459064, 25.518262081), (3.415223183, 23.920742908))
            ThreePointArc((3.415223183, 23.920742908), (4.121714038, 23.676511234), (4.819906526, 23.409479983))
            ThreePointArc((4.819906526, 23.409479983), (5.704107095, 24.752960785), (6.794177909, 25.935541409))
        make_face()
    extrude(amount=-CUT_EXTRUDE12_DEPTH, mode=Mode.SUBTRACT)

    # Sketch14 → Cut-Extrude13 (cut, through all)
    with BuildSketch(Plane.ZY.offset(-6.995955282)):
        with BuildLine():
            ThreePointArc((10.784169245, 23.740578759), (9.307404632, 24.660068928), (7.772720481, 25.479239514))
            ThreePointArc((7.772720481, 25.479239514), (7.567495178, 23.884048652), (7.106682346, 22.343138906))
            ThreePointArc((7.106682346, 22.343138906), (7.760029632, 21.97993681), (8.401245517, 21.59572251))
            ThreePointArc((8.401245517, 21.59572251), (9.505306086, 22.765253002), (10.784169245, 23.740578759))
        make_face()
    extrude(amount=-CUT_EXTRUDE13_DEPTH, mode=Mode.SUBTRACT)

    # Sketch15 → Revolve2 (revolve)
    with BuildSketch(Plane.XY.offset(-3.755095368), mode=Mode.PRIVATE) as revolve2_sk:
        with Locations((-1.004070118, 5.785155255)):
            Rectangle(SKETCH15_W, SKETCH15_H)
    revolve(revolve2_sk.sketch.rotate(Axis((-9.004095518, 2.035155255, -3.755095368), (1, 0, 0)), 270), axis=Axis((-9.004095518, 2.035155255, -3.755095368), (1, 0, 0)))

    # Ø6.0 (6) Diameter Hole1
    with Locations(Plane(origin=(17.995955282, 0, 0), x_dir=(0, 0, -1), z_dir=(1, 0, 0))):
        with Locations((3.755095368, 2.035155255)):
            Hole(F_6_0_6_DIAMETER_HOLE1_D / 2, depth=F_6_0_6_DIAMETER_HOLE1_DEPTH)

    # Sketch22 → Cut-Extrude14 (cut, two sides: drawn at the far end of the back side and taken through both)
    with BuildSketch(Plane(origin=(0, 0, 0), x_dir=(0, 0, -1), z_dir=(1, 0, 0)).offset(-CUT_EXTRUDE14_DEPTH_BACK)):
        with Locations((3.766902128, 1.977678158)):
            Circle(SKETCH22_R)
    extrude(amount=CUT_EXTRUDE14_DEPTH + CUT_EXTRUDE14_DEPTH_BACK, mode=Mode.SUBTRACT)

    # Sketch23 → Cut-Extrude15 (cut, two sides: drawn at the far end of the back side and taken through both)
    with BuildSketch(Plane.XY.offset(-CUT_EXTRUDE15_DEPTH_BACK)):
        with Locations((-2.691269596, 2.301526246)):
            Circle(SKETCH23_R)
    extrude(amount=CUT_EXTRUDE15_DEPTH + CUT_EXTRUDE15_DEPTH_BACK, mode=Mode.SUBTRACT)

    # Split1 outline → Split1 (cut)
    with BuildSketch(Plane.YZ.offset(SPLIT1_START)):
        with BuildLine():
            ThreePointArc((25.053273853, -4.502511763), (-9.479969745, -23.699876923), (-10.12118563, 15.805471888))
            ThreePointArc((-10.12118563, 15.805471888), (-11.225246199, 16.97500238), (-12.504109358, 17.950328137))
            ThreePointArc((-12.504109358, 17.950328137), (-11.027344745, -26.380009041), (28.102235716, -5.493756122))
            ThreePointArc((28.102235716, -5.493756122), (26.618147254, -4.873891017), (25.053273853, -4.502511763))
        make_face()
    extrude(amount=SPLIT1_DEPTH, mode=Mode.SUBTRACT)


solid = part.part
